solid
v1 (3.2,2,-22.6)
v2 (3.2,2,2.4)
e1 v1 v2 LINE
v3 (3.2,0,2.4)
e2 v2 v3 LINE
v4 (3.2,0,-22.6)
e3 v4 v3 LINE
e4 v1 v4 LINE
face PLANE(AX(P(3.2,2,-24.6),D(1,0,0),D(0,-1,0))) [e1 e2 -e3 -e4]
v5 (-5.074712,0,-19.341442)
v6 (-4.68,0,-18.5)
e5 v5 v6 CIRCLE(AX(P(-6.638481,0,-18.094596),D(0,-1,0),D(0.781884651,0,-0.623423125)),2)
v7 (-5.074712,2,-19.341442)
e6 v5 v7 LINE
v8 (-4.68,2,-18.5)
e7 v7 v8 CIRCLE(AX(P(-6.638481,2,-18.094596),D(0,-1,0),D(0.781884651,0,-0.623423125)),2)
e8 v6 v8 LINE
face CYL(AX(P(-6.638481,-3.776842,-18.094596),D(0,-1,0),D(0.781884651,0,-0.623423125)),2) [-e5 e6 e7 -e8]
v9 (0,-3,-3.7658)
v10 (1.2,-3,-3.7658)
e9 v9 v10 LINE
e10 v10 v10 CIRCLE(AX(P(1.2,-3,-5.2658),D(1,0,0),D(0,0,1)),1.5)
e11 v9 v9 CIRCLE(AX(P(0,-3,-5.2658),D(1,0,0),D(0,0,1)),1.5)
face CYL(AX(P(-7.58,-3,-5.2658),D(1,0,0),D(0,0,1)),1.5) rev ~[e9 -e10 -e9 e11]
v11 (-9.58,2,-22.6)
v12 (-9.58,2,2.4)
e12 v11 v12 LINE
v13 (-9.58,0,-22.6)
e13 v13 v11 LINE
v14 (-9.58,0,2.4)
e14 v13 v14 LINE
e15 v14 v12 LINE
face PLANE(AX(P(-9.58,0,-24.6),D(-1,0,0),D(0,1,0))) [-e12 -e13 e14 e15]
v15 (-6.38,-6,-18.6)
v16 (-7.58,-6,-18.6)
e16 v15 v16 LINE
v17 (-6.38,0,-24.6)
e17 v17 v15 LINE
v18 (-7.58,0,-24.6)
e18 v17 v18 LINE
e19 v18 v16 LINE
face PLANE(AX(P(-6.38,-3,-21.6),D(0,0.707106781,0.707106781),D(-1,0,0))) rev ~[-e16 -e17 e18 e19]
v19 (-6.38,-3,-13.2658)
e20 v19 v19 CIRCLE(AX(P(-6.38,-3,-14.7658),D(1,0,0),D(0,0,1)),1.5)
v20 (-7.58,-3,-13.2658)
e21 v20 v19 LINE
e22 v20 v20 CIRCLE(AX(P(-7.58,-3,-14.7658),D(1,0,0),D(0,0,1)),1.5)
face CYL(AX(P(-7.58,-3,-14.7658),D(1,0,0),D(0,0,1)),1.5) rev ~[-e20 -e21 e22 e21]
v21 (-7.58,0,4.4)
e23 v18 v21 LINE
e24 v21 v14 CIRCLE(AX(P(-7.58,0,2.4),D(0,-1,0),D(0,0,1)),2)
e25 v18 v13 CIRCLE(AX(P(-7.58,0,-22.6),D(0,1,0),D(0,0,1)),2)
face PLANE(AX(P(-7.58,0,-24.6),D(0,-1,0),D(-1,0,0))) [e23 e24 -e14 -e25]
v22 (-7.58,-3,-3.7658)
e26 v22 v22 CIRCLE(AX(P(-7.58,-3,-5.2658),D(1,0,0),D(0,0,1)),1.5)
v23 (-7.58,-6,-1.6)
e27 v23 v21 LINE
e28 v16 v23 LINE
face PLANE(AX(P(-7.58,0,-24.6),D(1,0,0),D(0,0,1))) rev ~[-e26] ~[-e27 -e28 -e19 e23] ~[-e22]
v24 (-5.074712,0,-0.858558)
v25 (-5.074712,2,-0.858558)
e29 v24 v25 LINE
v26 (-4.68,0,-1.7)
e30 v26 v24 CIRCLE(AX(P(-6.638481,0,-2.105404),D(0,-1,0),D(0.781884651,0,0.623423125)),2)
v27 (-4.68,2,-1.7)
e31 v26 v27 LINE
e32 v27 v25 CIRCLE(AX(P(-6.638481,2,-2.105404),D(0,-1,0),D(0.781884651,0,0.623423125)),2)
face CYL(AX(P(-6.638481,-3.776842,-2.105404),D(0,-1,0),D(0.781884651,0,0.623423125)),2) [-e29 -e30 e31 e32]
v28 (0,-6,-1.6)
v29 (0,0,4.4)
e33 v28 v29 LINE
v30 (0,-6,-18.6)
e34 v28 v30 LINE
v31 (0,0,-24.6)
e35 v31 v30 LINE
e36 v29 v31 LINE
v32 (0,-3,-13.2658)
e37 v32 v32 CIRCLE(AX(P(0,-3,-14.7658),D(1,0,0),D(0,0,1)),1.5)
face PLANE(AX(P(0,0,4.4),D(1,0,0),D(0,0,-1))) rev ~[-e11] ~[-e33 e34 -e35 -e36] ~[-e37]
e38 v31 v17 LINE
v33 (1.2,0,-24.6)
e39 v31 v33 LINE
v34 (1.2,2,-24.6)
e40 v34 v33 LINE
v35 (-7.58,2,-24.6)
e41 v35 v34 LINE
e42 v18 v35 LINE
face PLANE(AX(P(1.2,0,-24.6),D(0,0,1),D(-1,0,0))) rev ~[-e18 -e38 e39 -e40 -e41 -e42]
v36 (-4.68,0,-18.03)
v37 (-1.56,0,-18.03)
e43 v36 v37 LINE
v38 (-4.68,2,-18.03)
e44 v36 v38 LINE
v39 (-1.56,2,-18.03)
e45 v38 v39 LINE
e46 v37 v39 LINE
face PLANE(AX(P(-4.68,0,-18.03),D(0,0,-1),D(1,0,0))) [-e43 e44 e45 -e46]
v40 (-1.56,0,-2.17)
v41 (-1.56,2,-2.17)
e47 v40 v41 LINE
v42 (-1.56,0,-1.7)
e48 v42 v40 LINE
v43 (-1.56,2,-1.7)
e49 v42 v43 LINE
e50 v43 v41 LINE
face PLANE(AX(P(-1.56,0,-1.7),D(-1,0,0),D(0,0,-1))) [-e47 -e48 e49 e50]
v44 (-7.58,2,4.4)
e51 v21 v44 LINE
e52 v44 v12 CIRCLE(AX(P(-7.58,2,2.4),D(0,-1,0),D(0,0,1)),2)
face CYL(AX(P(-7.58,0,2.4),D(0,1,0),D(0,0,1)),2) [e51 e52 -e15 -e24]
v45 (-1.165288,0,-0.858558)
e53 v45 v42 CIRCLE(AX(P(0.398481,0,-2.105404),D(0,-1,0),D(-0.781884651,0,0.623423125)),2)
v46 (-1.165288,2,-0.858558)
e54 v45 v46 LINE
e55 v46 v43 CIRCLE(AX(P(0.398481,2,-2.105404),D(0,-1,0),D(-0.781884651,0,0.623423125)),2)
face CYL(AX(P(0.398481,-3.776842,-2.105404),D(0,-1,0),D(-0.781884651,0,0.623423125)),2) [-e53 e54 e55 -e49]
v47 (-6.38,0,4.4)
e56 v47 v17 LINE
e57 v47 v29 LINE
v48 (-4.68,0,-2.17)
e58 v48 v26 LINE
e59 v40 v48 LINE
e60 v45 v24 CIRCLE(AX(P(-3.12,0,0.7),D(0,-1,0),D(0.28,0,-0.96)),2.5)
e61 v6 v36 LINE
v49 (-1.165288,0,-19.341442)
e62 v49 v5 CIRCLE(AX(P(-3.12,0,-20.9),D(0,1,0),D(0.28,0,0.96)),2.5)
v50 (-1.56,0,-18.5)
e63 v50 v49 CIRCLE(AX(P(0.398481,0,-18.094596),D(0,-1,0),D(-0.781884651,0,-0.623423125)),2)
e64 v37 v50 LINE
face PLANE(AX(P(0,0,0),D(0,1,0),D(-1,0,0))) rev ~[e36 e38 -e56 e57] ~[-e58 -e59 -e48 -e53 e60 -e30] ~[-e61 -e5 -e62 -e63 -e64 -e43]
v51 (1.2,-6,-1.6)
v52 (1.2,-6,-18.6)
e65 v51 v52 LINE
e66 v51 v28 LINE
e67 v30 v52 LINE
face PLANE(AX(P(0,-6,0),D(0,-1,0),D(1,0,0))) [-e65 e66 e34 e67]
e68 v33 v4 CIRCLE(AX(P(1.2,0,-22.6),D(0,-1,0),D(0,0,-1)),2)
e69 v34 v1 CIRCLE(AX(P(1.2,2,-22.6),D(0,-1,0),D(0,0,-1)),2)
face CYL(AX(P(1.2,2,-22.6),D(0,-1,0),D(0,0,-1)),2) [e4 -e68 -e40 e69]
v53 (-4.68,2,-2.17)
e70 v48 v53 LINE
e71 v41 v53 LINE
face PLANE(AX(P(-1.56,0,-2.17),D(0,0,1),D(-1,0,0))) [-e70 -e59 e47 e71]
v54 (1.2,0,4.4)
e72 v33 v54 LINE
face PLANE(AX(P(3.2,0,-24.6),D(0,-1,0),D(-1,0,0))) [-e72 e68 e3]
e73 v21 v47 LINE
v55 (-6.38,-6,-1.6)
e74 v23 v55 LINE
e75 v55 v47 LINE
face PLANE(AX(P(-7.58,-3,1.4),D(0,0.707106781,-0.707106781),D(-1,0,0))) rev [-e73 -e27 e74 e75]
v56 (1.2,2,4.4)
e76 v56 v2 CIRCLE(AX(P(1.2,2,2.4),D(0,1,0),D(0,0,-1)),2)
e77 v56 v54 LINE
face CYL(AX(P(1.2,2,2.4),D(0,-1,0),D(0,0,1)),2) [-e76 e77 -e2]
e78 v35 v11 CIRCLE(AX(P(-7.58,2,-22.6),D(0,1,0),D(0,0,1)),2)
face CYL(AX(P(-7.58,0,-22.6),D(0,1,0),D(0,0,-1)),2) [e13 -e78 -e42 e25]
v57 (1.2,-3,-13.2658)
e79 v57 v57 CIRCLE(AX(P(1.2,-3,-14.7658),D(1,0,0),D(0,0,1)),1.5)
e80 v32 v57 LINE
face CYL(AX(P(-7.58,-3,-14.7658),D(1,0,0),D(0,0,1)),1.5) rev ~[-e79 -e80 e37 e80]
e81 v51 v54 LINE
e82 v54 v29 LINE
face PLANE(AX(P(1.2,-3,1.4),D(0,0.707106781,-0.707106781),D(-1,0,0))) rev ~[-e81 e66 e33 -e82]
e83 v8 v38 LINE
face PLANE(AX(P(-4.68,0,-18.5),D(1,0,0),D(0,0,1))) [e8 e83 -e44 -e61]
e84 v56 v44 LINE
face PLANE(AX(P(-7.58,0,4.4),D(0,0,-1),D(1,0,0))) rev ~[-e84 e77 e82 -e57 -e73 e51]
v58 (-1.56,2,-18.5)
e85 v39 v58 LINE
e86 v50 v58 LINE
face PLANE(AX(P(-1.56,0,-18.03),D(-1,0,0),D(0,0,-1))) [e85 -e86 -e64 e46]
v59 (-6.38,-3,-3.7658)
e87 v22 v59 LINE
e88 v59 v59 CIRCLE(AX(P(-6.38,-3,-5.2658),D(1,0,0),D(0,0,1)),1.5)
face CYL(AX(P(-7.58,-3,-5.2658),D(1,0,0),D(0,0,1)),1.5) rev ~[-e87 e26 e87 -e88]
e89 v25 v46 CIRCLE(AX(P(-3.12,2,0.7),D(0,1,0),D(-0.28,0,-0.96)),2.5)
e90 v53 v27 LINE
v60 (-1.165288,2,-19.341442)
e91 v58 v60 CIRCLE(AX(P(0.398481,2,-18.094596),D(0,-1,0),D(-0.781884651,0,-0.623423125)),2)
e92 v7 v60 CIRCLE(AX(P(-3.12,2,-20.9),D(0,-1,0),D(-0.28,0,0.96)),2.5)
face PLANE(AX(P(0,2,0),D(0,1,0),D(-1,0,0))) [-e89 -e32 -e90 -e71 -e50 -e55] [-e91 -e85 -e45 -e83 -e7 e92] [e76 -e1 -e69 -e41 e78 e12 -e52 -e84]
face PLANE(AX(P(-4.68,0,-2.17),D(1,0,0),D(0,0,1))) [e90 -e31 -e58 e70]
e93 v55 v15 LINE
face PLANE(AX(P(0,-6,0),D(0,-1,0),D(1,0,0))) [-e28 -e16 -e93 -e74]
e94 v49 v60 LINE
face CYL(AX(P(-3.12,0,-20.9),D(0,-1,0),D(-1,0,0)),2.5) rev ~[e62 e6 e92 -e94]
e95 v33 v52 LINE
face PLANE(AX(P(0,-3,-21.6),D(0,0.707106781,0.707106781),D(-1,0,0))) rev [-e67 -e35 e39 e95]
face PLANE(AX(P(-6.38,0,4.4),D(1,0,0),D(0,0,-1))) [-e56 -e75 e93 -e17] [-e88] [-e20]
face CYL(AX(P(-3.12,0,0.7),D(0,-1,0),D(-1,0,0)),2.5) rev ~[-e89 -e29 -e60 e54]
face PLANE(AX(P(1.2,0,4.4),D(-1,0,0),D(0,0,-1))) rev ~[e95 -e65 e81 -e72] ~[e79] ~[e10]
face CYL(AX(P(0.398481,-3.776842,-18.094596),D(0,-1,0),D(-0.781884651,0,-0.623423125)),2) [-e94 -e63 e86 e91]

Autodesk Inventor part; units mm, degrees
ref_plane "YZ Plane" through (0, 0, 0) normal (1, 0, 0) x (0, 1, 0)
ref_plane "XZ Plane" through (0, 0, 0) normal (0, 1, 0) x (-1, 0, 0)
ref_plane "XY Plane" through (0, 0, 0) normal (0, 0, 1) x (1, 0, 0)
sketch "Sketch1" plane through (0, 0, 0) normal (0, 1, 0) x (-1, 0, 0)
  line L0 (0, 0) -> (6.38, 0)
  line L1 (6.38, 0) -> (6.38, -20.1)
  line L2 (6.38, -20.1) -> (0, -20.1)
  line L3 (0, -20.1) -> (0, 0)
  line L4 (4.68, -1.7) -> (1.56, -1.7)
  line L5 (1.56, -1.7) -> (1.56, -2.17)
  line L6 (1.56, -2.17) -> (4.68, -2.17)
  line L7 (4.68, -2.17) -> (4.68, -1.7)
  line L8 (4.68, -18.03) -> (1.56, -18.03)
  line L9 (1.56, -18.03) -> (1.56, -18.5)
  line L10 (1.56, -18.5) -> (4.68, -18.5)
  line L11 (4.68, -18.5) -> (4.68, -18.03)
  line L12 (7.58, 4.4) -> (-1.2, 4.4)
  line L13 (-1.2, 4.4) -> (-1.2, -24.6)
  line L14 (-1.2, -24.6) -> (7.58, -24.6)
  line L15 (7.58, -24.6) -> (7.58, 4.4)
  circle A0 centre (3.12, -20.9) radius 2.5
  circle A1 centre (3.12, 0.7) radius 2.5
  line L16 (5.105, 3.2) -> (1.56, 3.2) construction
  line L17 (5.6212, -23.4) -> (1.5588, -23.4) construction
  point P0 (3.12, -18.5)
  point P1 (3.82, -1.7)
  point P2 (2.42, -18.5)
  point P3 (2.42, -1.7)
  point P4 (3.82, -18.5)
  dimension "d0" = 20.1
  dimension "d1" = 6.38
  dimension "d2" = 0.47
  dimension "d3" = 3.12
  dimension "d4" = 1.7
  dimension "d5" = 1.7
  dimension "d6" = 1.6
  dimension "d7" = 1.7
  dimension "d8" = 5
  dimension "d9" = 1.2
  dimension "d10" = 1.2
  dimension "d11" = 1.2
  dimension "d12" = 1.2
  dimension "d15" = 2.4
  dimension "d16" = 2.4
extrude "Extrusion1" add sketch "Sketch1" along normal blind 2 contours L0 A1 L4 L5 L6 L7 L1 L2 A0 L10 L11 L8 L9 L3 | L15 L14 L13 L12
fillet "Fillet1" radius 2 4 edges at (-3.82, 1, -1.7) (-2.42, 1, -1.7) (-2.42, 1, -18.5) (-3.82, 1, -18.5)
sketch "Sketch2" plane through (0, 0, 0) normal (0, -1, 0) x (1, 0, 0)
  line L0 (1.2, 4.4) -> (1.2, -24.6) projected
  line L1 (1.2, 4.4) -> (0, 4.4)
  line L2 (0, 4.4) -> (0, -24.6)
  line L3 (0, -24.6) -> (1.2, -24.6)
  line L4 (1.2, -24.6) -> (1.2, 4.4)
  line L5 (1.2, -24.6) -> (-7.58, -24.6) projected
  line L6 (-7.58, -24.6) -> (-7.58, 4.4) projected
  line L7 (-7.58, 4.4) -> (-6.38, 4.4)
  line L8 (-6.38, 4.4) -> (-6.38, -24.6)
  line L9 (-6.38, -24.6) -> (-7.58, -24.6)
  line L10 (-7.58, -24.6) -> (-7.58, 4.4)
  point P0 (0, 0)
  dimension "d18" = 1.2
  dimension "d19" = 1.2
extrude "Extrusion2" add sketch "Sketch2" along normal blind 6
sketch "Sketch3" plane through (1.2, 2, -24.6) normal (0, 0, -1) x (-1, 0, 0)
  line L0 (1.2, -2) -> (7.58, -2) projected
  line L1 (7.58, -2) -> (7.58, -8) projected
  line L2 (8.78, -8) -> (7.58, -8) projected
  line L3 (8.78, -8) -> (8.78, 0) projected
  line L4 (0, 0) -> (8.78, 0) projected
  line L5 (0, -8) -> (0, 0) projected
  line L6 (1.2, -8) -> (0, -8) projected
  line L7 (1.2, -2) -> (1.2, -8) projected
  line L8 (-2, -2) -> (10.78, -2)
  line L9 (10.78, -2) -> (10.78, 0)
  line L10 (10.78, 0) -> (-2, 0)
  line L11 (-2, 0) -> (-2, -2)
  line L12 (1.2, -2) -> (7.58, -2) projected
  line L13 (0, 0) -> (8.78, 0) projected
  point P0 (8.78, 0)
  point P1 (8.78, -2)
  point P2 (0, -2)
  dimension "d22" = 2
  dimension "d23" = 2
extrude "Extrusion3" add sketch "Sketch3" against normal up to surface (29 mm away) contours L8 L11 L10 L5 | L3 L10 L9 L8
sketch "Sketch4" plane through (-7.58, -6, -24.6) normal (-1, 0, 0) x (0, 0, 1)
  line L0 (6.1, 6) -> (6.57, 6) projected
  line L1 (6.57, 6) -> (6.57, 8) projected
  line L2 (6.1, 8) -> (6.57, 8) projected
  line L3 (6.1, 6) -> (6.1, 8) projected
  line L4 (22.43, 6) -> (22.9, 6) projected
  line L5 (22.9, 6) -> (22.9, 8) projected
  line L6 (22.43, 8) -> (22.9, 8) projected
  line L7 (22.43, 6) -> (22.43, 8) projected
  line L8 (29, 6) -> (0, 6) projected
  point P0 (24.6, 6)
  point P1 (9.8342, 3)
  point P2 (19.3342, 3)
  dimension "d26" = 9.5
  dimension "d27" = 3
hole "Hole1" at (-7.58, -3, -14.7658) at (-7.58, -3, -5.2658) direction (1, 0, 0) diameter 3 end through all
fillet "Fillet2" radius 2 4 edges at (-9.58, 1, -24.6) (-9.58, 1, 4.4) (3.2, 1, -24.6) (3.2, 1, 4.4)
chamfer "Chamfer1" distance 6 angle 45 4 edges at (0.6, -6, -24.6) (0.6, -6, 4.4) (-6.98, -6, 4.4) (-6.98, -6, -24.6)
equation "\"d10\" = d9"
equation "\"d11\" = d9"
properties part number "Magnet Mount"
